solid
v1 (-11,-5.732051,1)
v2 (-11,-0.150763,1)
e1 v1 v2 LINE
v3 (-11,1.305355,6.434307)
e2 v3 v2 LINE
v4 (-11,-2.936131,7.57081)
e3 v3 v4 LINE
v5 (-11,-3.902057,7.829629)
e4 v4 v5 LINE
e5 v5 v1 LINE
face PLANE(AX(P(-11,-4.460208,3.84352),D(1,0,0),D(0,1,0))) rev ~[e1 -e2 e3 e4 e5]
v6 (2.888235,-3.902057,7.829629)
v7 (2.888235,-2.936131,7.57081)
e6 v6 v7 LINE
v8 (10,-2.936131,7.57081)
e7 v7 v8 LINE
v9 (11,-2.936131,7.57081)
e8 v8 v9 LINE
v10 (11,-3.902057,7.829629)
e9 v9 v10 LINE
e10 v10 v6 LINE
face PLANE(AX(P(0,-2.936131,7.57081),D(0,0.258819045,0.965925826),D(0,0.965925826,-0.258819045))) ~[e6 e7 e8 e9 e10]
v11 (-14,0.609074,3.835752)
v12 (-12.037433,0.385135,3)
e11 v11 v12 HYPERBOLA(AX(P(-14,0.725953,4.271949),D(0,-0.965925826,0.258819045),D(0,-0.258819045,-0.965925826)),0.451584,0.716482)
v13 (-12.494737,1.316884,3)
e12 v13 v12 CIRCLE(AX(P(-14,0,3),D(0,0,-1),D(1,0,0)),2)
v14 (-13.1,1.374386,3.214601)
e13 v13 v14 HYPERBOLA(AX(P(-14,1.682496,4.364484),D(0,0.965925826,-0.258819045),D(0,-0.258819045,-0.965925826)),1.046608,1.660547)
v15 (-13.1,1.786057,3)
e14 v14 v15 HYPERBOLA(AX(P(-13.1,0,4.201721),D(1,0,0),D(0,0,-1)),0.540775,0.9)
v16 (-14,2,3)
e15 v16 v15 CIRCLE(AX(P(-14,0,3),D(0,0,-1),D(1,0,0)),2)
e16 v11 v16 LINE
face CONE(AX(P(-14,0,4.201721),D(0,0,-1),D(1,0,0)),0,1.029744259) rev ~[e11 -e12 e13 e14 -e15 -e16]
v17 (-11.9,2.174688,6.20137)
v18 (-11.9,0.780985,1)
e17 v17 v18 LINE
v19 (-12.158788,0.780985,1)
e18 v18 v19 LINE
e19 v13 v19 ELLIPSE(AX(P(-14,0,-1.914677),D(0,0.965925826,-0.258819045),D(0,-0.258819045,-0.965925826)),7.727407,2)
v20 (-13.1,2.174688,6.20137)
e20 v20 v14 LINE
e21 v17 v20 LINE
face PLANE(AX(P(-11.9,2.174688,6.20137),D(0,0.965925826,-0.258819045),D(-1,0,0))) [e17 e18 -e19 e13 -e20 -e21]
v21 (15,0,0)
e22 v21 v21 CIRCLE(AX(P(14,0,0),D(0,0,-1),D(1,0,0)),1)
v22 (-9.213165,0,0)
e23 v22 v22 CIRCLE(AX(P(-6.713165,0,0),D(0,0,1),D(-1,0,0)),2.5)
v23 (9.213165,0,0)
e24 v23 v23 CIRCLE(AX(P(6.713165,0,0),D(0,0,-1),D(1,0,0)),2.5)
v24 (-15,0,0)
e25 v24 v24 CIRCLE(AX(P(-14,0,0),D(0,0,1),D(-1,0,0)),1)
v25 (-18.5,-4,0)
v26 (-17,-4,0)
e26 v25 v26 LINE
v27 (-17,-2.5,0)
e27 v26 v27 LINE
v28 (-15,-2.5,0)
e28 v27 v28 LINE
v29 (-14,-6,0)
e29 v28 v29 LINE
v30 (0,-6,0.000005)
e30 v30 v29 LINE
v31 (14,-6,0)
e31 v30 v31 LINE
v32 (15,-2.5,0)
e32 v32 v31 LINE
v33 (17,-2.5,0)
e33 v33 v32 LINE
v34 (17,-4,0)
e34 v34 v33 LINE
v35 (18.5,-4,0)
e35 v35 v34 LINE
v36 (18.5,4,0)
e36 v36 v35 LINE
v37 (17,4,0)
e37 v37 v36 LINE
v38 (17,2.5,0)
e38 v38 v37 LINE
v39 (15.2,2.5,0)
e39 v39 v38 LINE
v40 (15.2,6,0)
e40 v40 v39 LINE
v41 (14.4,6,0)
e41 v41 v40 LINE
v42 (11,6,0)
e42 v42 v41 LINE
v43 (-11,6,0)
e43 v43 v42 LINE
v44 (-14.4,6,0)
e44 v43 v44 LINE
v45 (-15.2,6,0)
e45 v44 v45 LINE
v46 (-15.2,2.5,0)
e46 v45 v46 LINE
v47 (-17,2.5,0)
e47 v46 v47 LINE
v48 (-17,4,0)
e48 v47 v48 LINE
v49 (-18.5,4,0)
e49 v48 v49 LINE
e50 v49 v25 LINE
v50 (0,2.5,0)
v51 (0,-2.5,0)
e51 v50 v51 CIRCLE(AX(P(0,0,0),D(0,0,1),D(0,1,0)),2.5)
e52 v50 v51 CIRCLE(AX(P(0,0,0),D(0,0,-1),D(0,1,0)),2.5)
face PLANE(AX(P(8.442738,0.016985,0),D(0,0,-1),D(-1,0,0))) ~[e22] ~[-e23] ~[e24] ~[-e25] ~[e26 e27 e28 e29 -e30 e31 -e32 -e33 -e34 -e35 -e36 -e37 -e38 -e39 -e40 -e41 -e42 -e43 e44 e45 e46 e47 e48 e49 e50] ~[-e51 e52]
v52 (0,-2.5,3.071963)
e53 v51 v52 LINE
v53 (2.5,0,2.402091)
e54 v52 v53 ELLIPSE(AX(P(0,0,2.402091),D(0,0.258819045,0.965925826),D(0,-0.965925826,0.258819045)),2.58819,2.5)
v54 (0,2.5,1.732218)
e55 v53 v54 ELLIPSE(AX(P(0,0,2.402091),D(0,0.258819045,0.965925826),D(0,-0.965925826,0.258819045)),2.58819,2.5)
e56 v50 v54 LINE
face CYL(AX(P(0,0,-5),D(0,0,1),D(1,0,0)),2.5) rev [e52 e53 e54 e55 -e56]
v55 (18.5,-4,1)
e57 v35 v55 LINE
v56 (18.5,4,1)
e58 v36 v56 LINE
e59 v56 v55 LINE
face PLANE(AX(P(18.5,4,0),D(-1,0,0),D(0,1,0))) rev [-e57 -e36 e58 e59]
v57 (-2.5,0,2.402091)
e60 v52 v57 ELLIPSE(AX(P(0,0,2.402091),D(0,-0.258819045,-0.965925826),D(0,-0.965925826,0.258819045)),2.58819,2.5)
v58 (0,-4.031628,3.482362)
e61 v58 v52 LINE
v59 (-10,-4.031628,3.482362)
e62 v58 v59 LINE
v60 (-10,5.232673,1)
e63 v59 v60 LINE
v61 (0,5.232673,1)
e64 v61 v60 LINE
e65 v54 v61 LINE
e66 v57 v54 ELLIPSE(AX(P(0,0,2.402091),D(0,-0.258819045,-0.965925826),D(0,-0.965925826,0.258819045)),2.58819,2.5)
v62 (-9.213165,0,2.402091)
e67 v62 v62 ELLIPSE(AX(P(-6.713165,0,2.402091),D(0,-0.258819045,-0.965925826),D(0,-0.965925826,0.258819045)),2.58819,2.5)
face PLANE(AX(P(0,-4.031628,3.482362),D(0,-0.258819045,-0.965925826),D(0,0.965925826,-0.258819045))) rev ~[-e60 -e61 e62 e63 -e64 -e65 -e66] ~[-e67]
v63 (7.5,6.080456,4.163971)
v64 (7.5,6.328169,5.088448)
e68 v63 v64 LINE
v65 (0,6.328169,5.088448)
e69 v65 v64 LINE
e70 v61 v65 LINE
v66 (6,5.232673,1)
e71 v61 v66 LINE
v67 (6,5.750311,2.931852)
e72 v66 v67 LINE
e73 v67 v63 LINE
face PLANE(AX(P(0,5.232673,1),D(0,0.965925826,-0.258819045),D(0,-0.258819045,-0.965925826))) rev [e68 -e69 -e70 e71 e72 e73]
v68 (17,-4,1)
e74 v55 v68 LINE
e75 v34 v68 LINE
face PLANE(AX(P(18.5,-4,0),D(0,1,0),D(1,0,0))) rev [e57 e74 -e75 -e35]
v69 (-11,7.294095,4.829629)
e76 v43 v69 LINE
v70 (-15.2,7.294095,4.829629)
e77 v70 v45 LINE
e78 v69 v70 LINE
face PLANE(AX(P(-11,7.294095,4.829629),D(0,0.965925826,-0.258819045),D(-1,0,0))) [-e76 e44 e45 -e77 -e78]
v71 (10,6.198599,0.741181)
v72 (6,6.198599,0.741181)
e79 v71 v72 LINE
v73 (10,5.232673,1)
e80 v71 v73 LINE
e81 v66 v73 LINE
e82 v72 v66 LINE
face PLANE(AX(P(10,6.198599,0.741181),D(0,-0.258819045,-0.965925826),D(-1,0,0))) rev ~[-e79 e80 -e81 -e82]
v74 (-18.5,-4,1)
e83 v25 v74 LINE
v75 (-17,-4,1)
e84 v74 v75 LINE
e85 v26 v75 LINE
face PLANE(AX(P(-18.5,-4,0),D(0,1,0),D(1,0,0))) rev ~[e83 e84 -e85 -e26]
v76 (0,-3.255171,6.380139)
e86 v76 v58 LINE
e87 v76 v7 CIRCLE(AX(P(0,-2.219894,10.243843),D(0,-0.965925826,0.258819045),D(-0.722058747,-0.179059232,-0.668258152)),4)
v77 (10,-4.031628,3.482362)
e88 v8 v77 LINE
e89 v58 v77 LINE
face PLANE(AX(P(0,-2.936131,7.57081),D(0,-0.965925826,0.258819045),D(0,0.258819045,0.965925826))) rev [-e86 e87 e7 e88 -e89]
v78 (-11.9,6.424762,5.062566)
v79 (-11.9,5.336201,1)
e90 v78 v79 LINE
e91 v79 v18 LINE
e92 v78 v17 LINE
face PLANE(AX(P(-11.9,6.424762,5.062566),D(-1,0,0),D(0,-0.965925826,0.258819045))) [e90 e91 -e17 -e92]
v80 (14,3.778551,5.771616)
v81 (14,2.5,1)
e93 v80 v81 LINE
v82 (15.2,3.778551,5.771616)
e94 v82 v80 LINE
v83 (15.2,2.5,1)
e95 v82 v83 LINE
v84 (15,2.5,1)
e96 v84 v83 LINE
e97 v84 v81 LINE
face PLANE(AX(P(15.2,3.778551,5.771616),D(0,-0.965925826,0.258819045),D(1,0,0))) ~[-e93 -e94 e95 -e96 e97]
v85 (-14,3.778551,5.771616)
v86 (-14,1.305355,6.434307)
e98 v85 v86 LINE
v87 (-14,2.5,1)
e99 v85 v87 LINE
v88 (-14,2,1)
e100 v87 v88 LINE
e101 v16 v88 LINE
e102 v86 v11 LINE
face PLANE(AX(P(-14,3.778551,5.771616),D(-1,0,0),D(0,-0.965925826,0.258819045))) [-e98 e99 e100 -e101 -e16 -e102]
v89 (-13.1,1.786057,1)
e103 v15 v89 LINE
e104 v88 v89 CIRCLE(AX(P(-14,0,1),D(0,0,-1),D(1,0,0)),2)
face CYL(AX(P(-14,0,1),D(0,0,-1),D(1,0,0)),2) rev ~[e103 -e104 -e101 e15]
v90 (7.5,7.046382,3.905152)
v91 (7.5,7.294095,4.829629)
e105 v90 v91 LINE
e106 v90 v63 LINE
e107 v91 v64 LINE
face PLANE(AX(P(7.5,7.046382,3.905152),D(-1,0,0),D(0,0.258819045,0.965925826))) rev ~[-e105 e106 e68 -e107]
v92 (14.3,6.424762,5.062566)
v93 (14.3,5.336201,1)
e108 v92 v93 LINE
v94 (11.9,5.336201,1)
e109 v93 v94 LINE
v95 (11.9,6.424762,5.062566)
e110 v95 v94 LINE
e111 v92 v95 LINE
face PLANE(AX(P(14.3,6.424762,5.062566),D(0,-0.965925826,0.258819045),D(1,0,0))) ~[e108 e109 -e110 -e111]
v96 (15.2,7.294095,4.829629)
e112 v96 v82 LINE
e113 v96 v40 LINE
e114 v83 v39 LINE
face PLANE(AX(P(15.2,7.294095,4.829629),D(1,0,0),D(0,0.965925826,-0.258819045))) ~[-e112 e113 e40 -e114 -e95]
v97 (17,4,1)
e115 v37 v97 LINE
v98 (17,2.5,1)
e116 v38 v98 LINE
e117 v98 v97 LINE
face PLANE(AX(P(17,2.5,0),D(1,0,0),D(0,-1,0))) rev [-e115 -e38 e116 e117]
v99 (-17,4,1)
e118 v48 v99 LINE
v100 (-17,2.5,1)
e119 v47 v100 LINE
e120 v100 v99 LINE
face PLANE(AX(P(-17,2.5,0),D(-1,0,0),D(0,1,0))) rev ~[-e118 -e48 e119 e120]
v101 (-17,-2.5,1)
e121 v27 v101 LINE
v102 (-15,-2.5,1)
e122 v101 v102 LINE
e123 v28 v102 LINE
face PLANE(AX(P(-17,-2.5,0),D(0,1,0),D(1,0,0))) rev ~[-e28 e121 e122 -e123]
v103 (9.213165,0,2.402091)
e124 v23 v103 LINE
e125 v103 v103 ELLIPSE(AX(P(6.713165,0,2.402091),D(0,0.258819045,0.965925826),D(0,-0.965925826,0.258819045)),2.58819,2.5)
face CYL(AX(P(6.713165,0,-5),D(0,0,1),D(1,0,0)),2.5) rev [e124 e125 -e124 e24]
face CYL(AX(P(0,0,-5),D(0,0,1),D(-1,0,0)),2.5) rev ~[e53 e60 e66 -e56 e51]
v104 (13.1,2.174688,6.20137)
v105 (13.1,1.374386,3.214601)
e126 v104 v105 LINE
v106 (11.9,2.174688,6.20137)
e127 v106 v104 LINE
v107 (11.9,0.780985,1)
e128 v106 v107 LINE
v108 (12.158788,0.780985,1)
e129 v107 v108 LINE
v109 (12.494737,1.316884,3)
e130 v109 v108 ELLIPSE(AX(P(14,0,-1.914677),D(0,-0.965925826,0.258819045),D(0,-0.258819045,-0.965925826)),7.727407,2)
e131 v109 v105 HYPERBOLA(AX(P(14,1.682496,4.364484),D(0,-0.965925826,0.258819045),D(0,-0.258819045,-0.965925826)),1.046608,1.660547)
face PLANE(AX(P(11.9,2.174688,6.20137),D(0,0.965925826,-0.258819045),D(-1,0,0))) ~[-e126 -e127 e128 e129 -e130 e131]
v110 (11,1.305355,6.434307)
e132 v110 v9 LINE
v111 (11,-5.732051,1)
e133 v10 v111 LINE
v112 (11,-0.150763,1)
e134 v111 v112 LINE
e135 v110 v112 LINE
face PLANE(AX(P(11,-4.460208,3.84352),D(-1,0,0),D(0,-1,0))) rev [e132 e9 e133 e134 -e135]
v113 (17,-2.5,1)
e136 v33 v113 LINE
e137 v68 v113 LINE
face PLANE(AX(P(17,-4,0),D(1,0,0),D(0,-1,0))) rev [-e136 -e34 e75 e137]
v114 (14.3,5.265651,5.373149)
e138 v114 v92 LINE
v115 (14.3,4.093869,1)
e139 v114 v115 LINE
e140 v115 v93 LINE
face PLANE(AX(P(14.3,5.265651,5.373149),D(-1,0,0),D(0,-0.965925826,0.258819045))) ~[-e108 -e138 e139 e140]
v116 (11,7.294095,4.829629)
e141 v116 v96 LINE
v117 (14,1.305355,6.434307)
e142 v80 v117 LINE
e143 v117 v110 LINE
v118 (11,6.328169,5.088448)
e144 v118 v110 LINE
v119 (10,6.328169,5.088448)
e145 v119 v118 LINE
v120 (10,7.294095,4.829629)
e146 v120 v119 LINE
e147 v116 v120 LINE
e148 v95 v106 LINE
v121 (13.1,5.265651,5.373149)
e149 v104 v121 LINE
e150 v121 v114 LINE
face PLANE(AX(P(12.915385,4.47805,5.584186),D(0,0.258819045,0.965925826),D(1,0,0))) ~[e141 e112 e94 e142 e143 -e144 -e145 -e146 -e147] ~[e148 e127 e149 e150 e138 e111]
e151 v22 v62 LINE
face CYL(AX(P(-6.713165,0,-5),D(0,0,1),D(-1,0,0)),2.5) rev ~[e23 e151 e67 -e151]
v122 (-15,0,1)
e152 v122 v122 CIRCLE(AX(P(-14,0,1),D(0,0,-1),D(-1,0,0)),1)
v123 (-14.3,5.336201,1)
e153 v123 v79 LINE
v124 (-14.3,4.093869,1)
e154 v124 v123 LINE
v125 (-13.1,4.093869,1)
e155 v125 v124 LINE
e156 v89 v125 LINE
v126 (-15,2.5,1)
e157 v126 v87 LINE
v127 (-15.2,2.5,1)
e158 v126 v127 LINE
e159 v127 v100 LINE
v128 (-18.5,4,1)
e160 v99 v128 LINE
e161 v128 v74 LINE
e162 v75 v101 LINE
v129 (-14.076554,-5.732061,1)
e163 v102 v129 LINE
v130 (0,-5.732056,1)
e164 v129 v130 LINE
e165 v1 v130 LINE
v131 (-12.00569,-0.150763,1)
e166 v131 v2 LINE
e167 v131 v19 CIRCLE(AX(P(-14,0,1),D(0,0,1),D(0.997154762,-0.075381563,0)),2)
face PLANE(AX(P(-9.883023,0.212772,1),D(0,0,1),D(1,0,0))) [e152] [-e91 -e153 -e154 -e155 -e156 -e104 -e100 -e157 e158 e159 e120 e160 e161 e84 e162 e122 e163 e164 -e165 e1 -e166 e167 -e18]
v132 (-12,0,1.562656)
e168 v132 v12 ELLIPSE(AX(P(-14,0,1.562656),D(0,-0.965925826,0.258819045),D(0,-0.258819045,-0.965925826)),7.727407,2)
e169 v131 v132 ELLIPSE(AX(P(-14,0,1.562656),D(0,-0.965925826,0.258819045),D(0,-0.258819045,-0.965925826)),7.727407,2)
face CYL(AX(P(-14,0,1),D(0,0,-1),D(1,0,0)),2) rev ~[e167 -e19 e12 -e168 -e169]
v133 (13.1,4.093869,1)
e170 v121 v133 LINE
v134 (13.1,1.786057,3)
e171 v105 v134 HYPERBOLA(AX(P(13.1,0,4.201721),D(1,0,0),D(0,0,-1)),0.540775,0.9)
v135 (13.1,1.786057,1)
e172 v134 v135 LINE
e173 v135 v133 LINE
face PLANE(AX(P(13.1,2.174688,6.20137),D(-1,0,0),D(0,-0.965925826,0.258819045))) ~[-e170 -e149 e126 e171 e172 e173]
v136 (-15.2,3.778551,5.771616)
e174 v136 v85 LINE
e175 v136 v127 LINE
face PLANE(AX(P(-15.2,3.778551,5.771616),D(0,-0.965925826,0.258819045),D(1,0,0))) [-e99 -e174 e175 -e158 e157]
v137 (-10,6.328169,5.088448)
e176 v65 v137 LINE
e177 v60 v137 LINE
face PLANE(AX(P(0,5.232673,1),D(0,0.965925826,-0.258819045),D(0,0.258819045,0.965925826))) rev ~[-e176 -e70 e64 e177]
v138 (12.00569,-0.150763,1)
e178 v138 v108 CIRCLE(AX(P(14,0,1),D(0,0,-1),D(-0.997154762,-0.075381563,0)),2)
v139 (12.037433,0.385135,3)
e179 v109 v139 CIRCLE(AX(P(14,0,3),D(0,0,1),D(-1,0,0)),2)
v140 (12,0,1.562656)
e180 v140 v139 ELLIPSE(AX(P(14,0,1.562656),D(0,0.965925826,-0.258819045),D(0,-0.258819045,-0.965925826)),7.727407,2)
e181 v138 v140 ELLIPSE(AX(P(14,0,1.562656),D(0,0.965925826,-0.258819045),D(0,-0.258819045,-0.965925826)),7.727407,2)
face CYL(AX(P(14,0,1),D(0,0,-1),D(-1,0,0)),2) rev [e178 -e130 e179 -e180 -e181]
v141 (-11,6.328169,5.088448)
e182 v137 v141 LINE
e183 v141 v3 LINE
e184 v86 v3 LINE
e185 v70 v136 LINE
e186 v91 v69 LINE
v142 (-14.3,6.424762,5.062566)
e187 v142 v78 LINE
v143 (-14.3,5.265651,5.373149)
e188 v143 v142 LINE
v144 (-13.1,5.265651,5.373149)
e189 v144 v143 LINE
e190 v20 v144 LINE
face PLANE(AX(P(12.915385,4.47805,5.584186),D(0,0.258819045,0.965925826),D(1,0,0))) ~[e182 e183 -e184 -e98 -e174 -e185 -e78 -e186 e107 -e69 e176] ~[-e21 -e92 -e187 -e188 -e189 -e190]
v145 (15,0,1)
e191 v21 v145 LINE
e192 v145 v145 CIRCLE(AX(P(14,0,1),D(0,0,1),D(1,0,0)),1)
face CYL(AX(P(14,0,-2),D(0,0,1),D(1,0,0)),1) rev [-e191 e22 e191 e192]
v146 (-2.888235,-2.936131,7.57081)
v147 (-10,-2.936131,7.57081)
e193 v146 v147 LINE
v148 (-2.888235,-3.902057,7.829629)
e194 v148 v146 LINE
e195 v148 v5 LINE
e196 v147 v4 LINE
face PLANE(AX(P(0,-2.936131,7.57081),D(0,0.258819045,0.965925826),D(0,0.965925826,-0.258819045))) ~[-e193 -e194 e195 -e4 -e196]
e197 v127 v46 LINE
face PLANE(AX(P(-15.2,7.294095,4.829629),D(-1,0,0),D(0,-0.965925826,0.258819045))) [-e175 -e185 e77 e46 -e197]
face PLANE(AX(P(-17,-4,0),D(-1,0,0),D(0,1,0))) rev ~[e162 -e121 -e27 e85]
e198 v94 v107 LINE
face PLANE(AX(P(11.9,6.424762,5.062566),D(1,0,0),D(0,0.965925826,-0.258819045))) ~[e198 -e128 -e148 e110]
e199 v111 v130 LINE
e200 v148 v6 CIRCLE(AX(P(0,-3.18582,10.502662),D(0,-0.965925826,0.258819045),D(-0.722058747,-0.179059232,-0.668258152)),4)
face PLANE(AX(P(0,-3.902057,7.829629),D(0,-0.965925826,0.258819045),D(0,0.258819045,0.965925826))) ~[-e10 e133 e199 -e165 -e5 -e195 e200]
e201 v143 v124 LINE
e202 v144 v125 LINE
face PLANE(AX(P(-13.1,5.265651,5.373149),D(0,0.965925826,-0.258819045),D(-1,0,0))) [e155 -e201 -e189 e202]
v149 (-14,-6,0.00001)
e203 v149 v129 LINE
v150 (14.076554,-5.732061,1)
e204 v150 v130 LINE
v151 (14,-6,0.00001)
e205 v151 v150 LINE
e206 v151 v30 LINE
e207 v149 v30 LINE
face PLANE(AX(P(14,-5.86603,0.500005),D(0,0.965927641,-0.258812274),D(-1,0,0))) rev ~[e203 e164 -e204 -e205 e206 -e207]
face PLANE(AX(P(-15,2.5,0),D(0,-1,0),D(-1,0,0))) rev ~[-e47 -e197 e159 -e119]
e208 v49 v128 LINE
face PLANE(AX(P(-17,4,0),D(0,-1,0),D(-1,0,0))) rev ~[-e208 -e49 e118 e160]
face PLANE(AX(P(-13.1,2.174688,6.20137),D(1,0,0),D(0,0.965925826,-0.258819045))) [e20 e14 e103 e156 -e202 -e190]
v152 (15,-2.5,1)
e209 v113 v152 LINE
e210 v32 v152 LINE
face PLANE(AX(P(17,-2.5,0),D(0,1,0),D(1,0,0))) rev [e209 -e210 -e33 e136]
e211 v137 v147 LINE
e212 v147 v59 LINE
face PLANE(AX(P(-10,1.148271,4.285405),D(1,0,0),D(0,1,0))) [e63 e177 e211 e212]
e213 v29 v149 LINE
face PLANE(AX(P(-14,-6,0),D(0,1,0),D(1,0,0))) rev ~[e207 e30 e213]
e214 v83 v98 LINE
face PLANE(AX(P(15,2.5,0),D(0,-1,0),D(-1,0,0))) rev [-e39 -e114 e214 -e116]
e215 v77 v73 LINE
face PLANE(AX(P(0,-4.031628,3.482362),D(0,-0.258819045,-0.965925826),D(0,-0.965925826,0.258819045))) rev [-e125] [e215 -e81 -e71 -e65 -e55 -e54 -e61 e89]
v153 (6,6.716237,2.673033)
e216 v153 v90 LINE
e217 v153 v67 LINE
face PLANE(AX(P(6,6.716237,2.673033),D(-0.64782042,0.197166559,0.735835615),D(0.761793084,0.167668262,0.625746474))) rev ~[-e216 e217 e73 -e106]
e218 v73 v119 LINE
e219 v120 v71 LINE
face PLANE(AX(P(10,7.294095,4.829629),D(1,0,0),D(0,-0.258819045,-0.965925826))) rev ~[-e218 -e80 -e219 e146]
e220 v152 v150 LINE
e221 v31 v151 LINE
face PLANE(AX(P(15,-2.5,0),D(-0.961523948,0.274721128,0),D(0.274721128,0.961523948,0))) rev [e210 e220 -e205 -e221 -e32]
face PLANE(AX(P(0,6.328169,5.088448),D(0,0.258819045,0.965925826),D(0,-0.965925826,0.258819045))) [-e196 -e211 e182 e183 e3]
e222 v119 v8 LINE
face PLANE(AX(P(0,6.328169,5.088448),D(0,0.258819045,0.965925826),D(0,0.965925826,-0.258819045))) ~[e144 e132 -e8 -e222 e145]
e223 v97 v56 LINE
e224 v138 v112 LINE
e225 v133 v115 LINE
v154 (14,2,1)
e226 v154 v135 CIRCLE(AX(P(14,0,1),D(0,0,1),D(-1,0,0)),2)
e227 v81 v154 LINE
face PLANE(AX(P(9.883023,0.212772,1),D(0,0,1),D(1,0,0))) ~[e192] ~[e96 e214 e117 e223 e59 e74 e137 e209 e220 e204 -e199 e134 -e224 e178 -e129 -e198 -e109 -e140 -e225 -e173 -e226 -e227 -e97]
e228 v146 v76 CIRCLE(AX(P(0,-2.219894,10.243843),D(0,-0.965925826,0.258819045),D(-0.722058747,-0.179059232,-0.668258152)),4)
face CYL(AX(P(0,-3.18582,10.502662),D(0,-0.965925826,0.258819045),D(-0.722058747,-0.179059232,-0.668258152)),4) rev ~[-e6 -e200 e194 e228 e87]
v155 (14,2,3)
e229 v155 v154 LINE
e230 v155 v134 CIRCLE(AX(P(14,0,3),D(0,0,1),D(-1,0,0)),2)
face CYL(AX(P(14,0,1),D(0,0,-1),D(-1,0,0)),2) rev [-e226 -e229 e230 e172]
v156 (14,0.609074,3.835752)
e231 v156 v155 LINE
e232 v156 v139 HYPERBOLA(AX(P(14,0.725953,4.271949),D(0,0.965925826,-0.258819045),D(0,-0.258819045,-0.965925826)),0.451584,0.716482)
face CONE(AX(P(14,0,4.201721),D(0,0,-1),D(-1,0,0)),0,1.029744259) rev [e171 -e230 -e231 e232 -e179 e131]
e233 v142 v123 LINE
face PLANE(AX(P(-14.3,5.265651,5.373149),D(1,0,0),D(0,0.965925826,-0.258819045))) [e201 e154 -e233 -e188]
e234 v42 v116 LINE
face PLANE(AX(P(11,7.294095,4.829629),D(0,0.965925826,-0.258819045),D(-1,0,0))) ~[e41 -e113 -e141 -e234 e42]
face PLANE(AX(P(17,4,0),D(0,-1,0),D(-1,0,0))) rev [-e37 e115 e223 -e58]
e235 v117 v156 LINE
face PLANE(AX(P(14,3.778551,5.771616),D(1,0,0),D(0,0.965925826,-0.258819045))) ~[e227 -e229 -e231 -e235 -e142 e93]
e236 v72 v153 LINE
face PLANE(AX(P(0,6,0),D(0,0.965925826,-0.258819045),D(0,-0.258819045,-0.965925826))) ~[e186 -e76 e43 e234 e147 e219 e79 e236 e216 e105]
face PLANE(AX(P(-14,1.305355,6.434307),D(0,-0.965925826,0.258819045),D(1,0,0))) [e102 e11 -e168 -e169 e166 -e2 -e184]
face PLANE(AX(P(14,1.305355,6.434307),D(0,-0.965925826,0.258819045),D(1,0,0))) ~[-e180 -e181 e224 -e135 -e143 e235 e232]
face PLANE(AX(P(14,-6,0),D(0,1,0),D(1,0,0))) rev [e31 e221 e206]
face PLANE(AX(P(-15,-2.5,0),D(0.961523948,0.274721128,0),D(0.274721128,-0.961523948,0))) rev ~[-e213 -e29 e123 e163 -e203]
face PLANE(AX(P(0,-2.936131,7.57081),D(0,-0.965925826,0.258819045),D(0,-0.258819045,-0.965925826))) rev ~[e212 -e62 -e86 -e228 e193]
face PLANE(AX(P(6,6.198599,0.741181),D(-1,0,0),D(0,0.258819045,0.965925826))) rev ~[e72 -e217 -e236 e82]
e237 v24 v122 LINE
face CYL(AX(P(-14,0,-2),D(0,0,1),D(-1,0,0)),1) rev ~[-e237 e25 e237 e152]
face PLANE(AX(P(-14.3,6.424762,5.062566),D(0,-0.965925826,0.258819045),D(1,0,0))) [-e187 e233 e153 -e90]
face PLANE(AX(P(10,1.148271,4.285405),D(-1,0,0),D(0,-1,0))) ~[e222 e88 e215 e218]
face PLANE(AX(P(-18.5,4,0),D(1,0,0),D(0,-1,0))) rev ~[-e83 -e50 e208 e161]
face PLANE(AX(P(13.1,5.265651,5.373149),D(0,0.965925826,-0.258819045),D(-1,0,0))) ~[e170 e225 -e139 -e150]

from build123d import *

# Parameters (mm, degrees)
F1_DEPTH  = 1
F3_DEPTH  = 11
F4_DEPTH  = 10
F5_W      = 1.2
F5_H      = 0.6395594371
F6_REACH  = 15.595486632
F7_SIZE2  = 0.267939
F7_SIZE   = 0.99999
F8_D      = 2
F8_DEPTH  = 2
F8_TIP    = 0.600860619
F10_D     = 5
F10_DEPTH = 5
F10_TIP   = 1.5021515476
F11_D     = 4
F11_DEPTH = 2
F11_TIP   = 1.2017212381
F14_DEPTH = 1
F16_DEPTH = 1


# Not quite as in the source:
# - a fillet or chamfer is up to 0.001 mm smaller than in the source, because OpenCascade refuses the exact size
# - a feature names something its author has since deleted; it is built from what else it names


with BuildPart() as f1:
    # F0 (on Top) → F1 (new body)
    with BuildSketch(Plane.XY):
        Polygon((-18.5, 4), (-18.5, 0), (-18.5, -4), (-17, -4), (-17, -2.5), (-15, -2.5), (-14, -6), (0, -6), (0, 6), (-10.2, 6), (-10.2, -0.1), (-13.1, -0.1), (-13.1, 3.1), (-14.4, 3.1), (-14.4, 6), (-15, 2.5), (-17, 2.5), (-17, 4), align=None)
        Polygon((-10.2, 6), (-14.4, 6), (-14.4, 3.1), (-13.1, 3.1), (-13.1, -0.1), (-10.2, -0.1), align=None)
        Polygon((-11, 5.2), (-11, 0.7), (-12.3, 0.7), (-12.3, 3.9), (-13.6, 3.9), (-13.6, 5.2), align=None, mode=Mode.SUBTRACT)
        Polygon((-12.3, 0.7), (-11, 0.7), (-11, 5.2), (-13.6, 5.2), (-13.6, 3.9), (-12.3, 3.9), align=None)
    extrude(amount=F1_DEPTH)

    # F2 (on Right) → F3 (join)
    with BuildSketch(Plane.YZ):
        Polygon((-6, 0), (-4.9647238196, 0), (-4.0316277581, 3.4823619098), (-2.9361313709, 7.5708100863), (-3.9020571972, 7.8296291314), align=None)
        Polygon((4.9647238196, 0), (6, 0), (7.2940952255, 4.8296291314), (6.3281693992, 5.0884481765), (5.232673012, 1), align=None)
        Polygon((-4.9647238196, 0), (4.9647238196, 0), (5.232673012, 1), (-4.0316277581, 3.4823619098), align=None)
        Polygon((-4.0316277581, 3.4823619098), (5.232673012, 1), (6.3281693992, 5.0884481765), (-2.9361313709, 7.5708100863), align=None)
    extrude(amount=-F3_DEPTH)

    # F2 (on Right) → F4 (cut)
    with BuildSketch(Plane.YZ):
        Polygon((-4.0316277581, 3.4823619098), (5.232673012, 1), (6.3281693992, 5.0884481765), (-2.9361313709, 7.5708100863), align=None)
    extrude(amount=-F4_DEPTH, mode=Mode.SUBTRACT)

    f6_end = Plane(origin=(-8.4427376171, 0.0169846051, 0), x_dir=(-1, 0, 0), z_dir=(0, 0, -1))
    # F5 (on face) → F6 (join, up to a plane its end follows)
    with BuildSketch(Plane(origin=(0, 1.6960190142, 6.3296291314), x_dir=(1, 0, 0), z_dir=(0, 0.2588190451, 0.9659258263))):
        Polygon((-15.2, 5.7955549577), (-15.2, 2.7955549577), (-14, 2.7955549577), (-14, 2.1559955206), (-14, -0.4044450423), (-11, -0.4044450423), (-11, 5.7955549577), align=None)
        Polygon((-11.9, 4.8955549577), (-11.9, 0.4955549577), (-13.1, 0.4955549577), (-13.1, 3.6955549577), (-14.3, 3.6955549577), (-14.3, 4.8955549577), align=None, mode=Mode.SUBTRACT)
        with Locations((-14.6, 2.4757752392)):
            Rectangle(F5_W, F5_H)
    f6_long = extrude(amount=-F6_REACH, mode=Mode.PRIVATE)
    add(split(f6_long, bisect_by=f6_end, keep=Keep.BOTTOM, mode=Mode.PRIVATE))

    # F7 (size 1 and 0.2679491924 in the source; OpenCascade refuses exactly that, so slightly less here)
    f7_edges = [f1.edges().sort_by_distance(p)[0] for p in [
        (-7, -6, 1),
    ]]
    f7_side = f1.faces().sort_by_distance((-7, -6, 0.5))[0]
    chamfer(f7_edges, length=F7_SIZE, length2=F7_SIZE2, reference=f7_side)

    # F8
    with Locations(Plane(origin=(0, 0, 0), x_dir=(1, 0, 0), z_dir=(0, 0, -1))):
        with Locations((-14, 0)):
            Hole(F8_D / 2, depth=F8_DEPTH)
            with Locations((0, 0, -(F8_DEPTH + F8_TIP / 2))):  # 118° drill point
                Cone(0, F8_D / 2, F8_TIP, mode=Mode.SUBTRACT)

    # F10
    with Locations(Plane(origin=(0, 0, 0), x_dir=(1, 0, 0), z_dir=(0, 0, -1))):
        with Locations((-6.7131645046, 0), (0, 0)):
            Hole(F10_D / 2, depth=F10_DEPTH)
            with Locations((0, 0, -(F10_DEPTH + F10_TIP / 2))):  # 118° drill point
                Cone(0, F10_D / 2, F10_TIP, mode=Mode.SUBTRACT)

    # F11 (one way)
    with BuildSketch(Plane(origin=(0, 0, 1), x_dir=(1, 0, 0), z_dir=(0, 0, -1))):
        with Locations((-14, 0)):
            Circle(F11_D / 2)
    extrude(amount=-F11_DEPTH, mode=Mode.SUBTRACT)
    with Locations(Plane(origin=(0, 0, 1), x_dir=(1, 0, 0), z_dir=(0, 0, -1))):
        with Locations((-14, 0)):
            with Locations((0, 0, -(F11_DEPTH + F11_TIP / 2))):  # 118° drill point
                Cone(0, F11_D / 2, F11_TIP, mode=Mode.SUBTRACT)

    # F12: F1 across plane


with BuildPart() as f1_1:
    add(f1.part)
    add(f1.part.mirror(Plane.YZ))

    # F13 (on face) → F14 (cut)
    with BuildSketch(Plane(origin=(0, -5.5980762114, 1.5), x_dir=(1, 0, 0), z_dir=(0, -0.9659258263, 0.2588190451))):
        with BuildLine():
            Line((0, 6.5529142706), (-2.8882349873, 6.5529142706))
            ThreePointArc((-2.8882349873, 6.5529142706), (0, 5.3202412586), (2.8882349873, 6.5529142706))
            Line((2.8882349873, 6.5529142706), (0, 6.5529142706))
        make_face()
    extrude(amount=-F14_DEPTH, mode=Mode.SUBTRACT)

    # F15 (on face) → F16 (cut, through all)
    with BuildSketch(Plane(origin=(0, 5.5980762114, -1.5), x_dir=(-1, 0, 0), z_dir=(0, 0.9659258263, -0.2588190451))):
        Polygon((-7.5, 6.5529142706), (-10, 6.5529142706), (-10, 2.3202412586), (-6, 2.3202412586), (-6, 4.3202412586), (-7.5, 5.5958246812), align=None)
    extrude(amount=-F16_DEPTH, mode=Mode.SUBTRACT)


solid = f1_1.part
